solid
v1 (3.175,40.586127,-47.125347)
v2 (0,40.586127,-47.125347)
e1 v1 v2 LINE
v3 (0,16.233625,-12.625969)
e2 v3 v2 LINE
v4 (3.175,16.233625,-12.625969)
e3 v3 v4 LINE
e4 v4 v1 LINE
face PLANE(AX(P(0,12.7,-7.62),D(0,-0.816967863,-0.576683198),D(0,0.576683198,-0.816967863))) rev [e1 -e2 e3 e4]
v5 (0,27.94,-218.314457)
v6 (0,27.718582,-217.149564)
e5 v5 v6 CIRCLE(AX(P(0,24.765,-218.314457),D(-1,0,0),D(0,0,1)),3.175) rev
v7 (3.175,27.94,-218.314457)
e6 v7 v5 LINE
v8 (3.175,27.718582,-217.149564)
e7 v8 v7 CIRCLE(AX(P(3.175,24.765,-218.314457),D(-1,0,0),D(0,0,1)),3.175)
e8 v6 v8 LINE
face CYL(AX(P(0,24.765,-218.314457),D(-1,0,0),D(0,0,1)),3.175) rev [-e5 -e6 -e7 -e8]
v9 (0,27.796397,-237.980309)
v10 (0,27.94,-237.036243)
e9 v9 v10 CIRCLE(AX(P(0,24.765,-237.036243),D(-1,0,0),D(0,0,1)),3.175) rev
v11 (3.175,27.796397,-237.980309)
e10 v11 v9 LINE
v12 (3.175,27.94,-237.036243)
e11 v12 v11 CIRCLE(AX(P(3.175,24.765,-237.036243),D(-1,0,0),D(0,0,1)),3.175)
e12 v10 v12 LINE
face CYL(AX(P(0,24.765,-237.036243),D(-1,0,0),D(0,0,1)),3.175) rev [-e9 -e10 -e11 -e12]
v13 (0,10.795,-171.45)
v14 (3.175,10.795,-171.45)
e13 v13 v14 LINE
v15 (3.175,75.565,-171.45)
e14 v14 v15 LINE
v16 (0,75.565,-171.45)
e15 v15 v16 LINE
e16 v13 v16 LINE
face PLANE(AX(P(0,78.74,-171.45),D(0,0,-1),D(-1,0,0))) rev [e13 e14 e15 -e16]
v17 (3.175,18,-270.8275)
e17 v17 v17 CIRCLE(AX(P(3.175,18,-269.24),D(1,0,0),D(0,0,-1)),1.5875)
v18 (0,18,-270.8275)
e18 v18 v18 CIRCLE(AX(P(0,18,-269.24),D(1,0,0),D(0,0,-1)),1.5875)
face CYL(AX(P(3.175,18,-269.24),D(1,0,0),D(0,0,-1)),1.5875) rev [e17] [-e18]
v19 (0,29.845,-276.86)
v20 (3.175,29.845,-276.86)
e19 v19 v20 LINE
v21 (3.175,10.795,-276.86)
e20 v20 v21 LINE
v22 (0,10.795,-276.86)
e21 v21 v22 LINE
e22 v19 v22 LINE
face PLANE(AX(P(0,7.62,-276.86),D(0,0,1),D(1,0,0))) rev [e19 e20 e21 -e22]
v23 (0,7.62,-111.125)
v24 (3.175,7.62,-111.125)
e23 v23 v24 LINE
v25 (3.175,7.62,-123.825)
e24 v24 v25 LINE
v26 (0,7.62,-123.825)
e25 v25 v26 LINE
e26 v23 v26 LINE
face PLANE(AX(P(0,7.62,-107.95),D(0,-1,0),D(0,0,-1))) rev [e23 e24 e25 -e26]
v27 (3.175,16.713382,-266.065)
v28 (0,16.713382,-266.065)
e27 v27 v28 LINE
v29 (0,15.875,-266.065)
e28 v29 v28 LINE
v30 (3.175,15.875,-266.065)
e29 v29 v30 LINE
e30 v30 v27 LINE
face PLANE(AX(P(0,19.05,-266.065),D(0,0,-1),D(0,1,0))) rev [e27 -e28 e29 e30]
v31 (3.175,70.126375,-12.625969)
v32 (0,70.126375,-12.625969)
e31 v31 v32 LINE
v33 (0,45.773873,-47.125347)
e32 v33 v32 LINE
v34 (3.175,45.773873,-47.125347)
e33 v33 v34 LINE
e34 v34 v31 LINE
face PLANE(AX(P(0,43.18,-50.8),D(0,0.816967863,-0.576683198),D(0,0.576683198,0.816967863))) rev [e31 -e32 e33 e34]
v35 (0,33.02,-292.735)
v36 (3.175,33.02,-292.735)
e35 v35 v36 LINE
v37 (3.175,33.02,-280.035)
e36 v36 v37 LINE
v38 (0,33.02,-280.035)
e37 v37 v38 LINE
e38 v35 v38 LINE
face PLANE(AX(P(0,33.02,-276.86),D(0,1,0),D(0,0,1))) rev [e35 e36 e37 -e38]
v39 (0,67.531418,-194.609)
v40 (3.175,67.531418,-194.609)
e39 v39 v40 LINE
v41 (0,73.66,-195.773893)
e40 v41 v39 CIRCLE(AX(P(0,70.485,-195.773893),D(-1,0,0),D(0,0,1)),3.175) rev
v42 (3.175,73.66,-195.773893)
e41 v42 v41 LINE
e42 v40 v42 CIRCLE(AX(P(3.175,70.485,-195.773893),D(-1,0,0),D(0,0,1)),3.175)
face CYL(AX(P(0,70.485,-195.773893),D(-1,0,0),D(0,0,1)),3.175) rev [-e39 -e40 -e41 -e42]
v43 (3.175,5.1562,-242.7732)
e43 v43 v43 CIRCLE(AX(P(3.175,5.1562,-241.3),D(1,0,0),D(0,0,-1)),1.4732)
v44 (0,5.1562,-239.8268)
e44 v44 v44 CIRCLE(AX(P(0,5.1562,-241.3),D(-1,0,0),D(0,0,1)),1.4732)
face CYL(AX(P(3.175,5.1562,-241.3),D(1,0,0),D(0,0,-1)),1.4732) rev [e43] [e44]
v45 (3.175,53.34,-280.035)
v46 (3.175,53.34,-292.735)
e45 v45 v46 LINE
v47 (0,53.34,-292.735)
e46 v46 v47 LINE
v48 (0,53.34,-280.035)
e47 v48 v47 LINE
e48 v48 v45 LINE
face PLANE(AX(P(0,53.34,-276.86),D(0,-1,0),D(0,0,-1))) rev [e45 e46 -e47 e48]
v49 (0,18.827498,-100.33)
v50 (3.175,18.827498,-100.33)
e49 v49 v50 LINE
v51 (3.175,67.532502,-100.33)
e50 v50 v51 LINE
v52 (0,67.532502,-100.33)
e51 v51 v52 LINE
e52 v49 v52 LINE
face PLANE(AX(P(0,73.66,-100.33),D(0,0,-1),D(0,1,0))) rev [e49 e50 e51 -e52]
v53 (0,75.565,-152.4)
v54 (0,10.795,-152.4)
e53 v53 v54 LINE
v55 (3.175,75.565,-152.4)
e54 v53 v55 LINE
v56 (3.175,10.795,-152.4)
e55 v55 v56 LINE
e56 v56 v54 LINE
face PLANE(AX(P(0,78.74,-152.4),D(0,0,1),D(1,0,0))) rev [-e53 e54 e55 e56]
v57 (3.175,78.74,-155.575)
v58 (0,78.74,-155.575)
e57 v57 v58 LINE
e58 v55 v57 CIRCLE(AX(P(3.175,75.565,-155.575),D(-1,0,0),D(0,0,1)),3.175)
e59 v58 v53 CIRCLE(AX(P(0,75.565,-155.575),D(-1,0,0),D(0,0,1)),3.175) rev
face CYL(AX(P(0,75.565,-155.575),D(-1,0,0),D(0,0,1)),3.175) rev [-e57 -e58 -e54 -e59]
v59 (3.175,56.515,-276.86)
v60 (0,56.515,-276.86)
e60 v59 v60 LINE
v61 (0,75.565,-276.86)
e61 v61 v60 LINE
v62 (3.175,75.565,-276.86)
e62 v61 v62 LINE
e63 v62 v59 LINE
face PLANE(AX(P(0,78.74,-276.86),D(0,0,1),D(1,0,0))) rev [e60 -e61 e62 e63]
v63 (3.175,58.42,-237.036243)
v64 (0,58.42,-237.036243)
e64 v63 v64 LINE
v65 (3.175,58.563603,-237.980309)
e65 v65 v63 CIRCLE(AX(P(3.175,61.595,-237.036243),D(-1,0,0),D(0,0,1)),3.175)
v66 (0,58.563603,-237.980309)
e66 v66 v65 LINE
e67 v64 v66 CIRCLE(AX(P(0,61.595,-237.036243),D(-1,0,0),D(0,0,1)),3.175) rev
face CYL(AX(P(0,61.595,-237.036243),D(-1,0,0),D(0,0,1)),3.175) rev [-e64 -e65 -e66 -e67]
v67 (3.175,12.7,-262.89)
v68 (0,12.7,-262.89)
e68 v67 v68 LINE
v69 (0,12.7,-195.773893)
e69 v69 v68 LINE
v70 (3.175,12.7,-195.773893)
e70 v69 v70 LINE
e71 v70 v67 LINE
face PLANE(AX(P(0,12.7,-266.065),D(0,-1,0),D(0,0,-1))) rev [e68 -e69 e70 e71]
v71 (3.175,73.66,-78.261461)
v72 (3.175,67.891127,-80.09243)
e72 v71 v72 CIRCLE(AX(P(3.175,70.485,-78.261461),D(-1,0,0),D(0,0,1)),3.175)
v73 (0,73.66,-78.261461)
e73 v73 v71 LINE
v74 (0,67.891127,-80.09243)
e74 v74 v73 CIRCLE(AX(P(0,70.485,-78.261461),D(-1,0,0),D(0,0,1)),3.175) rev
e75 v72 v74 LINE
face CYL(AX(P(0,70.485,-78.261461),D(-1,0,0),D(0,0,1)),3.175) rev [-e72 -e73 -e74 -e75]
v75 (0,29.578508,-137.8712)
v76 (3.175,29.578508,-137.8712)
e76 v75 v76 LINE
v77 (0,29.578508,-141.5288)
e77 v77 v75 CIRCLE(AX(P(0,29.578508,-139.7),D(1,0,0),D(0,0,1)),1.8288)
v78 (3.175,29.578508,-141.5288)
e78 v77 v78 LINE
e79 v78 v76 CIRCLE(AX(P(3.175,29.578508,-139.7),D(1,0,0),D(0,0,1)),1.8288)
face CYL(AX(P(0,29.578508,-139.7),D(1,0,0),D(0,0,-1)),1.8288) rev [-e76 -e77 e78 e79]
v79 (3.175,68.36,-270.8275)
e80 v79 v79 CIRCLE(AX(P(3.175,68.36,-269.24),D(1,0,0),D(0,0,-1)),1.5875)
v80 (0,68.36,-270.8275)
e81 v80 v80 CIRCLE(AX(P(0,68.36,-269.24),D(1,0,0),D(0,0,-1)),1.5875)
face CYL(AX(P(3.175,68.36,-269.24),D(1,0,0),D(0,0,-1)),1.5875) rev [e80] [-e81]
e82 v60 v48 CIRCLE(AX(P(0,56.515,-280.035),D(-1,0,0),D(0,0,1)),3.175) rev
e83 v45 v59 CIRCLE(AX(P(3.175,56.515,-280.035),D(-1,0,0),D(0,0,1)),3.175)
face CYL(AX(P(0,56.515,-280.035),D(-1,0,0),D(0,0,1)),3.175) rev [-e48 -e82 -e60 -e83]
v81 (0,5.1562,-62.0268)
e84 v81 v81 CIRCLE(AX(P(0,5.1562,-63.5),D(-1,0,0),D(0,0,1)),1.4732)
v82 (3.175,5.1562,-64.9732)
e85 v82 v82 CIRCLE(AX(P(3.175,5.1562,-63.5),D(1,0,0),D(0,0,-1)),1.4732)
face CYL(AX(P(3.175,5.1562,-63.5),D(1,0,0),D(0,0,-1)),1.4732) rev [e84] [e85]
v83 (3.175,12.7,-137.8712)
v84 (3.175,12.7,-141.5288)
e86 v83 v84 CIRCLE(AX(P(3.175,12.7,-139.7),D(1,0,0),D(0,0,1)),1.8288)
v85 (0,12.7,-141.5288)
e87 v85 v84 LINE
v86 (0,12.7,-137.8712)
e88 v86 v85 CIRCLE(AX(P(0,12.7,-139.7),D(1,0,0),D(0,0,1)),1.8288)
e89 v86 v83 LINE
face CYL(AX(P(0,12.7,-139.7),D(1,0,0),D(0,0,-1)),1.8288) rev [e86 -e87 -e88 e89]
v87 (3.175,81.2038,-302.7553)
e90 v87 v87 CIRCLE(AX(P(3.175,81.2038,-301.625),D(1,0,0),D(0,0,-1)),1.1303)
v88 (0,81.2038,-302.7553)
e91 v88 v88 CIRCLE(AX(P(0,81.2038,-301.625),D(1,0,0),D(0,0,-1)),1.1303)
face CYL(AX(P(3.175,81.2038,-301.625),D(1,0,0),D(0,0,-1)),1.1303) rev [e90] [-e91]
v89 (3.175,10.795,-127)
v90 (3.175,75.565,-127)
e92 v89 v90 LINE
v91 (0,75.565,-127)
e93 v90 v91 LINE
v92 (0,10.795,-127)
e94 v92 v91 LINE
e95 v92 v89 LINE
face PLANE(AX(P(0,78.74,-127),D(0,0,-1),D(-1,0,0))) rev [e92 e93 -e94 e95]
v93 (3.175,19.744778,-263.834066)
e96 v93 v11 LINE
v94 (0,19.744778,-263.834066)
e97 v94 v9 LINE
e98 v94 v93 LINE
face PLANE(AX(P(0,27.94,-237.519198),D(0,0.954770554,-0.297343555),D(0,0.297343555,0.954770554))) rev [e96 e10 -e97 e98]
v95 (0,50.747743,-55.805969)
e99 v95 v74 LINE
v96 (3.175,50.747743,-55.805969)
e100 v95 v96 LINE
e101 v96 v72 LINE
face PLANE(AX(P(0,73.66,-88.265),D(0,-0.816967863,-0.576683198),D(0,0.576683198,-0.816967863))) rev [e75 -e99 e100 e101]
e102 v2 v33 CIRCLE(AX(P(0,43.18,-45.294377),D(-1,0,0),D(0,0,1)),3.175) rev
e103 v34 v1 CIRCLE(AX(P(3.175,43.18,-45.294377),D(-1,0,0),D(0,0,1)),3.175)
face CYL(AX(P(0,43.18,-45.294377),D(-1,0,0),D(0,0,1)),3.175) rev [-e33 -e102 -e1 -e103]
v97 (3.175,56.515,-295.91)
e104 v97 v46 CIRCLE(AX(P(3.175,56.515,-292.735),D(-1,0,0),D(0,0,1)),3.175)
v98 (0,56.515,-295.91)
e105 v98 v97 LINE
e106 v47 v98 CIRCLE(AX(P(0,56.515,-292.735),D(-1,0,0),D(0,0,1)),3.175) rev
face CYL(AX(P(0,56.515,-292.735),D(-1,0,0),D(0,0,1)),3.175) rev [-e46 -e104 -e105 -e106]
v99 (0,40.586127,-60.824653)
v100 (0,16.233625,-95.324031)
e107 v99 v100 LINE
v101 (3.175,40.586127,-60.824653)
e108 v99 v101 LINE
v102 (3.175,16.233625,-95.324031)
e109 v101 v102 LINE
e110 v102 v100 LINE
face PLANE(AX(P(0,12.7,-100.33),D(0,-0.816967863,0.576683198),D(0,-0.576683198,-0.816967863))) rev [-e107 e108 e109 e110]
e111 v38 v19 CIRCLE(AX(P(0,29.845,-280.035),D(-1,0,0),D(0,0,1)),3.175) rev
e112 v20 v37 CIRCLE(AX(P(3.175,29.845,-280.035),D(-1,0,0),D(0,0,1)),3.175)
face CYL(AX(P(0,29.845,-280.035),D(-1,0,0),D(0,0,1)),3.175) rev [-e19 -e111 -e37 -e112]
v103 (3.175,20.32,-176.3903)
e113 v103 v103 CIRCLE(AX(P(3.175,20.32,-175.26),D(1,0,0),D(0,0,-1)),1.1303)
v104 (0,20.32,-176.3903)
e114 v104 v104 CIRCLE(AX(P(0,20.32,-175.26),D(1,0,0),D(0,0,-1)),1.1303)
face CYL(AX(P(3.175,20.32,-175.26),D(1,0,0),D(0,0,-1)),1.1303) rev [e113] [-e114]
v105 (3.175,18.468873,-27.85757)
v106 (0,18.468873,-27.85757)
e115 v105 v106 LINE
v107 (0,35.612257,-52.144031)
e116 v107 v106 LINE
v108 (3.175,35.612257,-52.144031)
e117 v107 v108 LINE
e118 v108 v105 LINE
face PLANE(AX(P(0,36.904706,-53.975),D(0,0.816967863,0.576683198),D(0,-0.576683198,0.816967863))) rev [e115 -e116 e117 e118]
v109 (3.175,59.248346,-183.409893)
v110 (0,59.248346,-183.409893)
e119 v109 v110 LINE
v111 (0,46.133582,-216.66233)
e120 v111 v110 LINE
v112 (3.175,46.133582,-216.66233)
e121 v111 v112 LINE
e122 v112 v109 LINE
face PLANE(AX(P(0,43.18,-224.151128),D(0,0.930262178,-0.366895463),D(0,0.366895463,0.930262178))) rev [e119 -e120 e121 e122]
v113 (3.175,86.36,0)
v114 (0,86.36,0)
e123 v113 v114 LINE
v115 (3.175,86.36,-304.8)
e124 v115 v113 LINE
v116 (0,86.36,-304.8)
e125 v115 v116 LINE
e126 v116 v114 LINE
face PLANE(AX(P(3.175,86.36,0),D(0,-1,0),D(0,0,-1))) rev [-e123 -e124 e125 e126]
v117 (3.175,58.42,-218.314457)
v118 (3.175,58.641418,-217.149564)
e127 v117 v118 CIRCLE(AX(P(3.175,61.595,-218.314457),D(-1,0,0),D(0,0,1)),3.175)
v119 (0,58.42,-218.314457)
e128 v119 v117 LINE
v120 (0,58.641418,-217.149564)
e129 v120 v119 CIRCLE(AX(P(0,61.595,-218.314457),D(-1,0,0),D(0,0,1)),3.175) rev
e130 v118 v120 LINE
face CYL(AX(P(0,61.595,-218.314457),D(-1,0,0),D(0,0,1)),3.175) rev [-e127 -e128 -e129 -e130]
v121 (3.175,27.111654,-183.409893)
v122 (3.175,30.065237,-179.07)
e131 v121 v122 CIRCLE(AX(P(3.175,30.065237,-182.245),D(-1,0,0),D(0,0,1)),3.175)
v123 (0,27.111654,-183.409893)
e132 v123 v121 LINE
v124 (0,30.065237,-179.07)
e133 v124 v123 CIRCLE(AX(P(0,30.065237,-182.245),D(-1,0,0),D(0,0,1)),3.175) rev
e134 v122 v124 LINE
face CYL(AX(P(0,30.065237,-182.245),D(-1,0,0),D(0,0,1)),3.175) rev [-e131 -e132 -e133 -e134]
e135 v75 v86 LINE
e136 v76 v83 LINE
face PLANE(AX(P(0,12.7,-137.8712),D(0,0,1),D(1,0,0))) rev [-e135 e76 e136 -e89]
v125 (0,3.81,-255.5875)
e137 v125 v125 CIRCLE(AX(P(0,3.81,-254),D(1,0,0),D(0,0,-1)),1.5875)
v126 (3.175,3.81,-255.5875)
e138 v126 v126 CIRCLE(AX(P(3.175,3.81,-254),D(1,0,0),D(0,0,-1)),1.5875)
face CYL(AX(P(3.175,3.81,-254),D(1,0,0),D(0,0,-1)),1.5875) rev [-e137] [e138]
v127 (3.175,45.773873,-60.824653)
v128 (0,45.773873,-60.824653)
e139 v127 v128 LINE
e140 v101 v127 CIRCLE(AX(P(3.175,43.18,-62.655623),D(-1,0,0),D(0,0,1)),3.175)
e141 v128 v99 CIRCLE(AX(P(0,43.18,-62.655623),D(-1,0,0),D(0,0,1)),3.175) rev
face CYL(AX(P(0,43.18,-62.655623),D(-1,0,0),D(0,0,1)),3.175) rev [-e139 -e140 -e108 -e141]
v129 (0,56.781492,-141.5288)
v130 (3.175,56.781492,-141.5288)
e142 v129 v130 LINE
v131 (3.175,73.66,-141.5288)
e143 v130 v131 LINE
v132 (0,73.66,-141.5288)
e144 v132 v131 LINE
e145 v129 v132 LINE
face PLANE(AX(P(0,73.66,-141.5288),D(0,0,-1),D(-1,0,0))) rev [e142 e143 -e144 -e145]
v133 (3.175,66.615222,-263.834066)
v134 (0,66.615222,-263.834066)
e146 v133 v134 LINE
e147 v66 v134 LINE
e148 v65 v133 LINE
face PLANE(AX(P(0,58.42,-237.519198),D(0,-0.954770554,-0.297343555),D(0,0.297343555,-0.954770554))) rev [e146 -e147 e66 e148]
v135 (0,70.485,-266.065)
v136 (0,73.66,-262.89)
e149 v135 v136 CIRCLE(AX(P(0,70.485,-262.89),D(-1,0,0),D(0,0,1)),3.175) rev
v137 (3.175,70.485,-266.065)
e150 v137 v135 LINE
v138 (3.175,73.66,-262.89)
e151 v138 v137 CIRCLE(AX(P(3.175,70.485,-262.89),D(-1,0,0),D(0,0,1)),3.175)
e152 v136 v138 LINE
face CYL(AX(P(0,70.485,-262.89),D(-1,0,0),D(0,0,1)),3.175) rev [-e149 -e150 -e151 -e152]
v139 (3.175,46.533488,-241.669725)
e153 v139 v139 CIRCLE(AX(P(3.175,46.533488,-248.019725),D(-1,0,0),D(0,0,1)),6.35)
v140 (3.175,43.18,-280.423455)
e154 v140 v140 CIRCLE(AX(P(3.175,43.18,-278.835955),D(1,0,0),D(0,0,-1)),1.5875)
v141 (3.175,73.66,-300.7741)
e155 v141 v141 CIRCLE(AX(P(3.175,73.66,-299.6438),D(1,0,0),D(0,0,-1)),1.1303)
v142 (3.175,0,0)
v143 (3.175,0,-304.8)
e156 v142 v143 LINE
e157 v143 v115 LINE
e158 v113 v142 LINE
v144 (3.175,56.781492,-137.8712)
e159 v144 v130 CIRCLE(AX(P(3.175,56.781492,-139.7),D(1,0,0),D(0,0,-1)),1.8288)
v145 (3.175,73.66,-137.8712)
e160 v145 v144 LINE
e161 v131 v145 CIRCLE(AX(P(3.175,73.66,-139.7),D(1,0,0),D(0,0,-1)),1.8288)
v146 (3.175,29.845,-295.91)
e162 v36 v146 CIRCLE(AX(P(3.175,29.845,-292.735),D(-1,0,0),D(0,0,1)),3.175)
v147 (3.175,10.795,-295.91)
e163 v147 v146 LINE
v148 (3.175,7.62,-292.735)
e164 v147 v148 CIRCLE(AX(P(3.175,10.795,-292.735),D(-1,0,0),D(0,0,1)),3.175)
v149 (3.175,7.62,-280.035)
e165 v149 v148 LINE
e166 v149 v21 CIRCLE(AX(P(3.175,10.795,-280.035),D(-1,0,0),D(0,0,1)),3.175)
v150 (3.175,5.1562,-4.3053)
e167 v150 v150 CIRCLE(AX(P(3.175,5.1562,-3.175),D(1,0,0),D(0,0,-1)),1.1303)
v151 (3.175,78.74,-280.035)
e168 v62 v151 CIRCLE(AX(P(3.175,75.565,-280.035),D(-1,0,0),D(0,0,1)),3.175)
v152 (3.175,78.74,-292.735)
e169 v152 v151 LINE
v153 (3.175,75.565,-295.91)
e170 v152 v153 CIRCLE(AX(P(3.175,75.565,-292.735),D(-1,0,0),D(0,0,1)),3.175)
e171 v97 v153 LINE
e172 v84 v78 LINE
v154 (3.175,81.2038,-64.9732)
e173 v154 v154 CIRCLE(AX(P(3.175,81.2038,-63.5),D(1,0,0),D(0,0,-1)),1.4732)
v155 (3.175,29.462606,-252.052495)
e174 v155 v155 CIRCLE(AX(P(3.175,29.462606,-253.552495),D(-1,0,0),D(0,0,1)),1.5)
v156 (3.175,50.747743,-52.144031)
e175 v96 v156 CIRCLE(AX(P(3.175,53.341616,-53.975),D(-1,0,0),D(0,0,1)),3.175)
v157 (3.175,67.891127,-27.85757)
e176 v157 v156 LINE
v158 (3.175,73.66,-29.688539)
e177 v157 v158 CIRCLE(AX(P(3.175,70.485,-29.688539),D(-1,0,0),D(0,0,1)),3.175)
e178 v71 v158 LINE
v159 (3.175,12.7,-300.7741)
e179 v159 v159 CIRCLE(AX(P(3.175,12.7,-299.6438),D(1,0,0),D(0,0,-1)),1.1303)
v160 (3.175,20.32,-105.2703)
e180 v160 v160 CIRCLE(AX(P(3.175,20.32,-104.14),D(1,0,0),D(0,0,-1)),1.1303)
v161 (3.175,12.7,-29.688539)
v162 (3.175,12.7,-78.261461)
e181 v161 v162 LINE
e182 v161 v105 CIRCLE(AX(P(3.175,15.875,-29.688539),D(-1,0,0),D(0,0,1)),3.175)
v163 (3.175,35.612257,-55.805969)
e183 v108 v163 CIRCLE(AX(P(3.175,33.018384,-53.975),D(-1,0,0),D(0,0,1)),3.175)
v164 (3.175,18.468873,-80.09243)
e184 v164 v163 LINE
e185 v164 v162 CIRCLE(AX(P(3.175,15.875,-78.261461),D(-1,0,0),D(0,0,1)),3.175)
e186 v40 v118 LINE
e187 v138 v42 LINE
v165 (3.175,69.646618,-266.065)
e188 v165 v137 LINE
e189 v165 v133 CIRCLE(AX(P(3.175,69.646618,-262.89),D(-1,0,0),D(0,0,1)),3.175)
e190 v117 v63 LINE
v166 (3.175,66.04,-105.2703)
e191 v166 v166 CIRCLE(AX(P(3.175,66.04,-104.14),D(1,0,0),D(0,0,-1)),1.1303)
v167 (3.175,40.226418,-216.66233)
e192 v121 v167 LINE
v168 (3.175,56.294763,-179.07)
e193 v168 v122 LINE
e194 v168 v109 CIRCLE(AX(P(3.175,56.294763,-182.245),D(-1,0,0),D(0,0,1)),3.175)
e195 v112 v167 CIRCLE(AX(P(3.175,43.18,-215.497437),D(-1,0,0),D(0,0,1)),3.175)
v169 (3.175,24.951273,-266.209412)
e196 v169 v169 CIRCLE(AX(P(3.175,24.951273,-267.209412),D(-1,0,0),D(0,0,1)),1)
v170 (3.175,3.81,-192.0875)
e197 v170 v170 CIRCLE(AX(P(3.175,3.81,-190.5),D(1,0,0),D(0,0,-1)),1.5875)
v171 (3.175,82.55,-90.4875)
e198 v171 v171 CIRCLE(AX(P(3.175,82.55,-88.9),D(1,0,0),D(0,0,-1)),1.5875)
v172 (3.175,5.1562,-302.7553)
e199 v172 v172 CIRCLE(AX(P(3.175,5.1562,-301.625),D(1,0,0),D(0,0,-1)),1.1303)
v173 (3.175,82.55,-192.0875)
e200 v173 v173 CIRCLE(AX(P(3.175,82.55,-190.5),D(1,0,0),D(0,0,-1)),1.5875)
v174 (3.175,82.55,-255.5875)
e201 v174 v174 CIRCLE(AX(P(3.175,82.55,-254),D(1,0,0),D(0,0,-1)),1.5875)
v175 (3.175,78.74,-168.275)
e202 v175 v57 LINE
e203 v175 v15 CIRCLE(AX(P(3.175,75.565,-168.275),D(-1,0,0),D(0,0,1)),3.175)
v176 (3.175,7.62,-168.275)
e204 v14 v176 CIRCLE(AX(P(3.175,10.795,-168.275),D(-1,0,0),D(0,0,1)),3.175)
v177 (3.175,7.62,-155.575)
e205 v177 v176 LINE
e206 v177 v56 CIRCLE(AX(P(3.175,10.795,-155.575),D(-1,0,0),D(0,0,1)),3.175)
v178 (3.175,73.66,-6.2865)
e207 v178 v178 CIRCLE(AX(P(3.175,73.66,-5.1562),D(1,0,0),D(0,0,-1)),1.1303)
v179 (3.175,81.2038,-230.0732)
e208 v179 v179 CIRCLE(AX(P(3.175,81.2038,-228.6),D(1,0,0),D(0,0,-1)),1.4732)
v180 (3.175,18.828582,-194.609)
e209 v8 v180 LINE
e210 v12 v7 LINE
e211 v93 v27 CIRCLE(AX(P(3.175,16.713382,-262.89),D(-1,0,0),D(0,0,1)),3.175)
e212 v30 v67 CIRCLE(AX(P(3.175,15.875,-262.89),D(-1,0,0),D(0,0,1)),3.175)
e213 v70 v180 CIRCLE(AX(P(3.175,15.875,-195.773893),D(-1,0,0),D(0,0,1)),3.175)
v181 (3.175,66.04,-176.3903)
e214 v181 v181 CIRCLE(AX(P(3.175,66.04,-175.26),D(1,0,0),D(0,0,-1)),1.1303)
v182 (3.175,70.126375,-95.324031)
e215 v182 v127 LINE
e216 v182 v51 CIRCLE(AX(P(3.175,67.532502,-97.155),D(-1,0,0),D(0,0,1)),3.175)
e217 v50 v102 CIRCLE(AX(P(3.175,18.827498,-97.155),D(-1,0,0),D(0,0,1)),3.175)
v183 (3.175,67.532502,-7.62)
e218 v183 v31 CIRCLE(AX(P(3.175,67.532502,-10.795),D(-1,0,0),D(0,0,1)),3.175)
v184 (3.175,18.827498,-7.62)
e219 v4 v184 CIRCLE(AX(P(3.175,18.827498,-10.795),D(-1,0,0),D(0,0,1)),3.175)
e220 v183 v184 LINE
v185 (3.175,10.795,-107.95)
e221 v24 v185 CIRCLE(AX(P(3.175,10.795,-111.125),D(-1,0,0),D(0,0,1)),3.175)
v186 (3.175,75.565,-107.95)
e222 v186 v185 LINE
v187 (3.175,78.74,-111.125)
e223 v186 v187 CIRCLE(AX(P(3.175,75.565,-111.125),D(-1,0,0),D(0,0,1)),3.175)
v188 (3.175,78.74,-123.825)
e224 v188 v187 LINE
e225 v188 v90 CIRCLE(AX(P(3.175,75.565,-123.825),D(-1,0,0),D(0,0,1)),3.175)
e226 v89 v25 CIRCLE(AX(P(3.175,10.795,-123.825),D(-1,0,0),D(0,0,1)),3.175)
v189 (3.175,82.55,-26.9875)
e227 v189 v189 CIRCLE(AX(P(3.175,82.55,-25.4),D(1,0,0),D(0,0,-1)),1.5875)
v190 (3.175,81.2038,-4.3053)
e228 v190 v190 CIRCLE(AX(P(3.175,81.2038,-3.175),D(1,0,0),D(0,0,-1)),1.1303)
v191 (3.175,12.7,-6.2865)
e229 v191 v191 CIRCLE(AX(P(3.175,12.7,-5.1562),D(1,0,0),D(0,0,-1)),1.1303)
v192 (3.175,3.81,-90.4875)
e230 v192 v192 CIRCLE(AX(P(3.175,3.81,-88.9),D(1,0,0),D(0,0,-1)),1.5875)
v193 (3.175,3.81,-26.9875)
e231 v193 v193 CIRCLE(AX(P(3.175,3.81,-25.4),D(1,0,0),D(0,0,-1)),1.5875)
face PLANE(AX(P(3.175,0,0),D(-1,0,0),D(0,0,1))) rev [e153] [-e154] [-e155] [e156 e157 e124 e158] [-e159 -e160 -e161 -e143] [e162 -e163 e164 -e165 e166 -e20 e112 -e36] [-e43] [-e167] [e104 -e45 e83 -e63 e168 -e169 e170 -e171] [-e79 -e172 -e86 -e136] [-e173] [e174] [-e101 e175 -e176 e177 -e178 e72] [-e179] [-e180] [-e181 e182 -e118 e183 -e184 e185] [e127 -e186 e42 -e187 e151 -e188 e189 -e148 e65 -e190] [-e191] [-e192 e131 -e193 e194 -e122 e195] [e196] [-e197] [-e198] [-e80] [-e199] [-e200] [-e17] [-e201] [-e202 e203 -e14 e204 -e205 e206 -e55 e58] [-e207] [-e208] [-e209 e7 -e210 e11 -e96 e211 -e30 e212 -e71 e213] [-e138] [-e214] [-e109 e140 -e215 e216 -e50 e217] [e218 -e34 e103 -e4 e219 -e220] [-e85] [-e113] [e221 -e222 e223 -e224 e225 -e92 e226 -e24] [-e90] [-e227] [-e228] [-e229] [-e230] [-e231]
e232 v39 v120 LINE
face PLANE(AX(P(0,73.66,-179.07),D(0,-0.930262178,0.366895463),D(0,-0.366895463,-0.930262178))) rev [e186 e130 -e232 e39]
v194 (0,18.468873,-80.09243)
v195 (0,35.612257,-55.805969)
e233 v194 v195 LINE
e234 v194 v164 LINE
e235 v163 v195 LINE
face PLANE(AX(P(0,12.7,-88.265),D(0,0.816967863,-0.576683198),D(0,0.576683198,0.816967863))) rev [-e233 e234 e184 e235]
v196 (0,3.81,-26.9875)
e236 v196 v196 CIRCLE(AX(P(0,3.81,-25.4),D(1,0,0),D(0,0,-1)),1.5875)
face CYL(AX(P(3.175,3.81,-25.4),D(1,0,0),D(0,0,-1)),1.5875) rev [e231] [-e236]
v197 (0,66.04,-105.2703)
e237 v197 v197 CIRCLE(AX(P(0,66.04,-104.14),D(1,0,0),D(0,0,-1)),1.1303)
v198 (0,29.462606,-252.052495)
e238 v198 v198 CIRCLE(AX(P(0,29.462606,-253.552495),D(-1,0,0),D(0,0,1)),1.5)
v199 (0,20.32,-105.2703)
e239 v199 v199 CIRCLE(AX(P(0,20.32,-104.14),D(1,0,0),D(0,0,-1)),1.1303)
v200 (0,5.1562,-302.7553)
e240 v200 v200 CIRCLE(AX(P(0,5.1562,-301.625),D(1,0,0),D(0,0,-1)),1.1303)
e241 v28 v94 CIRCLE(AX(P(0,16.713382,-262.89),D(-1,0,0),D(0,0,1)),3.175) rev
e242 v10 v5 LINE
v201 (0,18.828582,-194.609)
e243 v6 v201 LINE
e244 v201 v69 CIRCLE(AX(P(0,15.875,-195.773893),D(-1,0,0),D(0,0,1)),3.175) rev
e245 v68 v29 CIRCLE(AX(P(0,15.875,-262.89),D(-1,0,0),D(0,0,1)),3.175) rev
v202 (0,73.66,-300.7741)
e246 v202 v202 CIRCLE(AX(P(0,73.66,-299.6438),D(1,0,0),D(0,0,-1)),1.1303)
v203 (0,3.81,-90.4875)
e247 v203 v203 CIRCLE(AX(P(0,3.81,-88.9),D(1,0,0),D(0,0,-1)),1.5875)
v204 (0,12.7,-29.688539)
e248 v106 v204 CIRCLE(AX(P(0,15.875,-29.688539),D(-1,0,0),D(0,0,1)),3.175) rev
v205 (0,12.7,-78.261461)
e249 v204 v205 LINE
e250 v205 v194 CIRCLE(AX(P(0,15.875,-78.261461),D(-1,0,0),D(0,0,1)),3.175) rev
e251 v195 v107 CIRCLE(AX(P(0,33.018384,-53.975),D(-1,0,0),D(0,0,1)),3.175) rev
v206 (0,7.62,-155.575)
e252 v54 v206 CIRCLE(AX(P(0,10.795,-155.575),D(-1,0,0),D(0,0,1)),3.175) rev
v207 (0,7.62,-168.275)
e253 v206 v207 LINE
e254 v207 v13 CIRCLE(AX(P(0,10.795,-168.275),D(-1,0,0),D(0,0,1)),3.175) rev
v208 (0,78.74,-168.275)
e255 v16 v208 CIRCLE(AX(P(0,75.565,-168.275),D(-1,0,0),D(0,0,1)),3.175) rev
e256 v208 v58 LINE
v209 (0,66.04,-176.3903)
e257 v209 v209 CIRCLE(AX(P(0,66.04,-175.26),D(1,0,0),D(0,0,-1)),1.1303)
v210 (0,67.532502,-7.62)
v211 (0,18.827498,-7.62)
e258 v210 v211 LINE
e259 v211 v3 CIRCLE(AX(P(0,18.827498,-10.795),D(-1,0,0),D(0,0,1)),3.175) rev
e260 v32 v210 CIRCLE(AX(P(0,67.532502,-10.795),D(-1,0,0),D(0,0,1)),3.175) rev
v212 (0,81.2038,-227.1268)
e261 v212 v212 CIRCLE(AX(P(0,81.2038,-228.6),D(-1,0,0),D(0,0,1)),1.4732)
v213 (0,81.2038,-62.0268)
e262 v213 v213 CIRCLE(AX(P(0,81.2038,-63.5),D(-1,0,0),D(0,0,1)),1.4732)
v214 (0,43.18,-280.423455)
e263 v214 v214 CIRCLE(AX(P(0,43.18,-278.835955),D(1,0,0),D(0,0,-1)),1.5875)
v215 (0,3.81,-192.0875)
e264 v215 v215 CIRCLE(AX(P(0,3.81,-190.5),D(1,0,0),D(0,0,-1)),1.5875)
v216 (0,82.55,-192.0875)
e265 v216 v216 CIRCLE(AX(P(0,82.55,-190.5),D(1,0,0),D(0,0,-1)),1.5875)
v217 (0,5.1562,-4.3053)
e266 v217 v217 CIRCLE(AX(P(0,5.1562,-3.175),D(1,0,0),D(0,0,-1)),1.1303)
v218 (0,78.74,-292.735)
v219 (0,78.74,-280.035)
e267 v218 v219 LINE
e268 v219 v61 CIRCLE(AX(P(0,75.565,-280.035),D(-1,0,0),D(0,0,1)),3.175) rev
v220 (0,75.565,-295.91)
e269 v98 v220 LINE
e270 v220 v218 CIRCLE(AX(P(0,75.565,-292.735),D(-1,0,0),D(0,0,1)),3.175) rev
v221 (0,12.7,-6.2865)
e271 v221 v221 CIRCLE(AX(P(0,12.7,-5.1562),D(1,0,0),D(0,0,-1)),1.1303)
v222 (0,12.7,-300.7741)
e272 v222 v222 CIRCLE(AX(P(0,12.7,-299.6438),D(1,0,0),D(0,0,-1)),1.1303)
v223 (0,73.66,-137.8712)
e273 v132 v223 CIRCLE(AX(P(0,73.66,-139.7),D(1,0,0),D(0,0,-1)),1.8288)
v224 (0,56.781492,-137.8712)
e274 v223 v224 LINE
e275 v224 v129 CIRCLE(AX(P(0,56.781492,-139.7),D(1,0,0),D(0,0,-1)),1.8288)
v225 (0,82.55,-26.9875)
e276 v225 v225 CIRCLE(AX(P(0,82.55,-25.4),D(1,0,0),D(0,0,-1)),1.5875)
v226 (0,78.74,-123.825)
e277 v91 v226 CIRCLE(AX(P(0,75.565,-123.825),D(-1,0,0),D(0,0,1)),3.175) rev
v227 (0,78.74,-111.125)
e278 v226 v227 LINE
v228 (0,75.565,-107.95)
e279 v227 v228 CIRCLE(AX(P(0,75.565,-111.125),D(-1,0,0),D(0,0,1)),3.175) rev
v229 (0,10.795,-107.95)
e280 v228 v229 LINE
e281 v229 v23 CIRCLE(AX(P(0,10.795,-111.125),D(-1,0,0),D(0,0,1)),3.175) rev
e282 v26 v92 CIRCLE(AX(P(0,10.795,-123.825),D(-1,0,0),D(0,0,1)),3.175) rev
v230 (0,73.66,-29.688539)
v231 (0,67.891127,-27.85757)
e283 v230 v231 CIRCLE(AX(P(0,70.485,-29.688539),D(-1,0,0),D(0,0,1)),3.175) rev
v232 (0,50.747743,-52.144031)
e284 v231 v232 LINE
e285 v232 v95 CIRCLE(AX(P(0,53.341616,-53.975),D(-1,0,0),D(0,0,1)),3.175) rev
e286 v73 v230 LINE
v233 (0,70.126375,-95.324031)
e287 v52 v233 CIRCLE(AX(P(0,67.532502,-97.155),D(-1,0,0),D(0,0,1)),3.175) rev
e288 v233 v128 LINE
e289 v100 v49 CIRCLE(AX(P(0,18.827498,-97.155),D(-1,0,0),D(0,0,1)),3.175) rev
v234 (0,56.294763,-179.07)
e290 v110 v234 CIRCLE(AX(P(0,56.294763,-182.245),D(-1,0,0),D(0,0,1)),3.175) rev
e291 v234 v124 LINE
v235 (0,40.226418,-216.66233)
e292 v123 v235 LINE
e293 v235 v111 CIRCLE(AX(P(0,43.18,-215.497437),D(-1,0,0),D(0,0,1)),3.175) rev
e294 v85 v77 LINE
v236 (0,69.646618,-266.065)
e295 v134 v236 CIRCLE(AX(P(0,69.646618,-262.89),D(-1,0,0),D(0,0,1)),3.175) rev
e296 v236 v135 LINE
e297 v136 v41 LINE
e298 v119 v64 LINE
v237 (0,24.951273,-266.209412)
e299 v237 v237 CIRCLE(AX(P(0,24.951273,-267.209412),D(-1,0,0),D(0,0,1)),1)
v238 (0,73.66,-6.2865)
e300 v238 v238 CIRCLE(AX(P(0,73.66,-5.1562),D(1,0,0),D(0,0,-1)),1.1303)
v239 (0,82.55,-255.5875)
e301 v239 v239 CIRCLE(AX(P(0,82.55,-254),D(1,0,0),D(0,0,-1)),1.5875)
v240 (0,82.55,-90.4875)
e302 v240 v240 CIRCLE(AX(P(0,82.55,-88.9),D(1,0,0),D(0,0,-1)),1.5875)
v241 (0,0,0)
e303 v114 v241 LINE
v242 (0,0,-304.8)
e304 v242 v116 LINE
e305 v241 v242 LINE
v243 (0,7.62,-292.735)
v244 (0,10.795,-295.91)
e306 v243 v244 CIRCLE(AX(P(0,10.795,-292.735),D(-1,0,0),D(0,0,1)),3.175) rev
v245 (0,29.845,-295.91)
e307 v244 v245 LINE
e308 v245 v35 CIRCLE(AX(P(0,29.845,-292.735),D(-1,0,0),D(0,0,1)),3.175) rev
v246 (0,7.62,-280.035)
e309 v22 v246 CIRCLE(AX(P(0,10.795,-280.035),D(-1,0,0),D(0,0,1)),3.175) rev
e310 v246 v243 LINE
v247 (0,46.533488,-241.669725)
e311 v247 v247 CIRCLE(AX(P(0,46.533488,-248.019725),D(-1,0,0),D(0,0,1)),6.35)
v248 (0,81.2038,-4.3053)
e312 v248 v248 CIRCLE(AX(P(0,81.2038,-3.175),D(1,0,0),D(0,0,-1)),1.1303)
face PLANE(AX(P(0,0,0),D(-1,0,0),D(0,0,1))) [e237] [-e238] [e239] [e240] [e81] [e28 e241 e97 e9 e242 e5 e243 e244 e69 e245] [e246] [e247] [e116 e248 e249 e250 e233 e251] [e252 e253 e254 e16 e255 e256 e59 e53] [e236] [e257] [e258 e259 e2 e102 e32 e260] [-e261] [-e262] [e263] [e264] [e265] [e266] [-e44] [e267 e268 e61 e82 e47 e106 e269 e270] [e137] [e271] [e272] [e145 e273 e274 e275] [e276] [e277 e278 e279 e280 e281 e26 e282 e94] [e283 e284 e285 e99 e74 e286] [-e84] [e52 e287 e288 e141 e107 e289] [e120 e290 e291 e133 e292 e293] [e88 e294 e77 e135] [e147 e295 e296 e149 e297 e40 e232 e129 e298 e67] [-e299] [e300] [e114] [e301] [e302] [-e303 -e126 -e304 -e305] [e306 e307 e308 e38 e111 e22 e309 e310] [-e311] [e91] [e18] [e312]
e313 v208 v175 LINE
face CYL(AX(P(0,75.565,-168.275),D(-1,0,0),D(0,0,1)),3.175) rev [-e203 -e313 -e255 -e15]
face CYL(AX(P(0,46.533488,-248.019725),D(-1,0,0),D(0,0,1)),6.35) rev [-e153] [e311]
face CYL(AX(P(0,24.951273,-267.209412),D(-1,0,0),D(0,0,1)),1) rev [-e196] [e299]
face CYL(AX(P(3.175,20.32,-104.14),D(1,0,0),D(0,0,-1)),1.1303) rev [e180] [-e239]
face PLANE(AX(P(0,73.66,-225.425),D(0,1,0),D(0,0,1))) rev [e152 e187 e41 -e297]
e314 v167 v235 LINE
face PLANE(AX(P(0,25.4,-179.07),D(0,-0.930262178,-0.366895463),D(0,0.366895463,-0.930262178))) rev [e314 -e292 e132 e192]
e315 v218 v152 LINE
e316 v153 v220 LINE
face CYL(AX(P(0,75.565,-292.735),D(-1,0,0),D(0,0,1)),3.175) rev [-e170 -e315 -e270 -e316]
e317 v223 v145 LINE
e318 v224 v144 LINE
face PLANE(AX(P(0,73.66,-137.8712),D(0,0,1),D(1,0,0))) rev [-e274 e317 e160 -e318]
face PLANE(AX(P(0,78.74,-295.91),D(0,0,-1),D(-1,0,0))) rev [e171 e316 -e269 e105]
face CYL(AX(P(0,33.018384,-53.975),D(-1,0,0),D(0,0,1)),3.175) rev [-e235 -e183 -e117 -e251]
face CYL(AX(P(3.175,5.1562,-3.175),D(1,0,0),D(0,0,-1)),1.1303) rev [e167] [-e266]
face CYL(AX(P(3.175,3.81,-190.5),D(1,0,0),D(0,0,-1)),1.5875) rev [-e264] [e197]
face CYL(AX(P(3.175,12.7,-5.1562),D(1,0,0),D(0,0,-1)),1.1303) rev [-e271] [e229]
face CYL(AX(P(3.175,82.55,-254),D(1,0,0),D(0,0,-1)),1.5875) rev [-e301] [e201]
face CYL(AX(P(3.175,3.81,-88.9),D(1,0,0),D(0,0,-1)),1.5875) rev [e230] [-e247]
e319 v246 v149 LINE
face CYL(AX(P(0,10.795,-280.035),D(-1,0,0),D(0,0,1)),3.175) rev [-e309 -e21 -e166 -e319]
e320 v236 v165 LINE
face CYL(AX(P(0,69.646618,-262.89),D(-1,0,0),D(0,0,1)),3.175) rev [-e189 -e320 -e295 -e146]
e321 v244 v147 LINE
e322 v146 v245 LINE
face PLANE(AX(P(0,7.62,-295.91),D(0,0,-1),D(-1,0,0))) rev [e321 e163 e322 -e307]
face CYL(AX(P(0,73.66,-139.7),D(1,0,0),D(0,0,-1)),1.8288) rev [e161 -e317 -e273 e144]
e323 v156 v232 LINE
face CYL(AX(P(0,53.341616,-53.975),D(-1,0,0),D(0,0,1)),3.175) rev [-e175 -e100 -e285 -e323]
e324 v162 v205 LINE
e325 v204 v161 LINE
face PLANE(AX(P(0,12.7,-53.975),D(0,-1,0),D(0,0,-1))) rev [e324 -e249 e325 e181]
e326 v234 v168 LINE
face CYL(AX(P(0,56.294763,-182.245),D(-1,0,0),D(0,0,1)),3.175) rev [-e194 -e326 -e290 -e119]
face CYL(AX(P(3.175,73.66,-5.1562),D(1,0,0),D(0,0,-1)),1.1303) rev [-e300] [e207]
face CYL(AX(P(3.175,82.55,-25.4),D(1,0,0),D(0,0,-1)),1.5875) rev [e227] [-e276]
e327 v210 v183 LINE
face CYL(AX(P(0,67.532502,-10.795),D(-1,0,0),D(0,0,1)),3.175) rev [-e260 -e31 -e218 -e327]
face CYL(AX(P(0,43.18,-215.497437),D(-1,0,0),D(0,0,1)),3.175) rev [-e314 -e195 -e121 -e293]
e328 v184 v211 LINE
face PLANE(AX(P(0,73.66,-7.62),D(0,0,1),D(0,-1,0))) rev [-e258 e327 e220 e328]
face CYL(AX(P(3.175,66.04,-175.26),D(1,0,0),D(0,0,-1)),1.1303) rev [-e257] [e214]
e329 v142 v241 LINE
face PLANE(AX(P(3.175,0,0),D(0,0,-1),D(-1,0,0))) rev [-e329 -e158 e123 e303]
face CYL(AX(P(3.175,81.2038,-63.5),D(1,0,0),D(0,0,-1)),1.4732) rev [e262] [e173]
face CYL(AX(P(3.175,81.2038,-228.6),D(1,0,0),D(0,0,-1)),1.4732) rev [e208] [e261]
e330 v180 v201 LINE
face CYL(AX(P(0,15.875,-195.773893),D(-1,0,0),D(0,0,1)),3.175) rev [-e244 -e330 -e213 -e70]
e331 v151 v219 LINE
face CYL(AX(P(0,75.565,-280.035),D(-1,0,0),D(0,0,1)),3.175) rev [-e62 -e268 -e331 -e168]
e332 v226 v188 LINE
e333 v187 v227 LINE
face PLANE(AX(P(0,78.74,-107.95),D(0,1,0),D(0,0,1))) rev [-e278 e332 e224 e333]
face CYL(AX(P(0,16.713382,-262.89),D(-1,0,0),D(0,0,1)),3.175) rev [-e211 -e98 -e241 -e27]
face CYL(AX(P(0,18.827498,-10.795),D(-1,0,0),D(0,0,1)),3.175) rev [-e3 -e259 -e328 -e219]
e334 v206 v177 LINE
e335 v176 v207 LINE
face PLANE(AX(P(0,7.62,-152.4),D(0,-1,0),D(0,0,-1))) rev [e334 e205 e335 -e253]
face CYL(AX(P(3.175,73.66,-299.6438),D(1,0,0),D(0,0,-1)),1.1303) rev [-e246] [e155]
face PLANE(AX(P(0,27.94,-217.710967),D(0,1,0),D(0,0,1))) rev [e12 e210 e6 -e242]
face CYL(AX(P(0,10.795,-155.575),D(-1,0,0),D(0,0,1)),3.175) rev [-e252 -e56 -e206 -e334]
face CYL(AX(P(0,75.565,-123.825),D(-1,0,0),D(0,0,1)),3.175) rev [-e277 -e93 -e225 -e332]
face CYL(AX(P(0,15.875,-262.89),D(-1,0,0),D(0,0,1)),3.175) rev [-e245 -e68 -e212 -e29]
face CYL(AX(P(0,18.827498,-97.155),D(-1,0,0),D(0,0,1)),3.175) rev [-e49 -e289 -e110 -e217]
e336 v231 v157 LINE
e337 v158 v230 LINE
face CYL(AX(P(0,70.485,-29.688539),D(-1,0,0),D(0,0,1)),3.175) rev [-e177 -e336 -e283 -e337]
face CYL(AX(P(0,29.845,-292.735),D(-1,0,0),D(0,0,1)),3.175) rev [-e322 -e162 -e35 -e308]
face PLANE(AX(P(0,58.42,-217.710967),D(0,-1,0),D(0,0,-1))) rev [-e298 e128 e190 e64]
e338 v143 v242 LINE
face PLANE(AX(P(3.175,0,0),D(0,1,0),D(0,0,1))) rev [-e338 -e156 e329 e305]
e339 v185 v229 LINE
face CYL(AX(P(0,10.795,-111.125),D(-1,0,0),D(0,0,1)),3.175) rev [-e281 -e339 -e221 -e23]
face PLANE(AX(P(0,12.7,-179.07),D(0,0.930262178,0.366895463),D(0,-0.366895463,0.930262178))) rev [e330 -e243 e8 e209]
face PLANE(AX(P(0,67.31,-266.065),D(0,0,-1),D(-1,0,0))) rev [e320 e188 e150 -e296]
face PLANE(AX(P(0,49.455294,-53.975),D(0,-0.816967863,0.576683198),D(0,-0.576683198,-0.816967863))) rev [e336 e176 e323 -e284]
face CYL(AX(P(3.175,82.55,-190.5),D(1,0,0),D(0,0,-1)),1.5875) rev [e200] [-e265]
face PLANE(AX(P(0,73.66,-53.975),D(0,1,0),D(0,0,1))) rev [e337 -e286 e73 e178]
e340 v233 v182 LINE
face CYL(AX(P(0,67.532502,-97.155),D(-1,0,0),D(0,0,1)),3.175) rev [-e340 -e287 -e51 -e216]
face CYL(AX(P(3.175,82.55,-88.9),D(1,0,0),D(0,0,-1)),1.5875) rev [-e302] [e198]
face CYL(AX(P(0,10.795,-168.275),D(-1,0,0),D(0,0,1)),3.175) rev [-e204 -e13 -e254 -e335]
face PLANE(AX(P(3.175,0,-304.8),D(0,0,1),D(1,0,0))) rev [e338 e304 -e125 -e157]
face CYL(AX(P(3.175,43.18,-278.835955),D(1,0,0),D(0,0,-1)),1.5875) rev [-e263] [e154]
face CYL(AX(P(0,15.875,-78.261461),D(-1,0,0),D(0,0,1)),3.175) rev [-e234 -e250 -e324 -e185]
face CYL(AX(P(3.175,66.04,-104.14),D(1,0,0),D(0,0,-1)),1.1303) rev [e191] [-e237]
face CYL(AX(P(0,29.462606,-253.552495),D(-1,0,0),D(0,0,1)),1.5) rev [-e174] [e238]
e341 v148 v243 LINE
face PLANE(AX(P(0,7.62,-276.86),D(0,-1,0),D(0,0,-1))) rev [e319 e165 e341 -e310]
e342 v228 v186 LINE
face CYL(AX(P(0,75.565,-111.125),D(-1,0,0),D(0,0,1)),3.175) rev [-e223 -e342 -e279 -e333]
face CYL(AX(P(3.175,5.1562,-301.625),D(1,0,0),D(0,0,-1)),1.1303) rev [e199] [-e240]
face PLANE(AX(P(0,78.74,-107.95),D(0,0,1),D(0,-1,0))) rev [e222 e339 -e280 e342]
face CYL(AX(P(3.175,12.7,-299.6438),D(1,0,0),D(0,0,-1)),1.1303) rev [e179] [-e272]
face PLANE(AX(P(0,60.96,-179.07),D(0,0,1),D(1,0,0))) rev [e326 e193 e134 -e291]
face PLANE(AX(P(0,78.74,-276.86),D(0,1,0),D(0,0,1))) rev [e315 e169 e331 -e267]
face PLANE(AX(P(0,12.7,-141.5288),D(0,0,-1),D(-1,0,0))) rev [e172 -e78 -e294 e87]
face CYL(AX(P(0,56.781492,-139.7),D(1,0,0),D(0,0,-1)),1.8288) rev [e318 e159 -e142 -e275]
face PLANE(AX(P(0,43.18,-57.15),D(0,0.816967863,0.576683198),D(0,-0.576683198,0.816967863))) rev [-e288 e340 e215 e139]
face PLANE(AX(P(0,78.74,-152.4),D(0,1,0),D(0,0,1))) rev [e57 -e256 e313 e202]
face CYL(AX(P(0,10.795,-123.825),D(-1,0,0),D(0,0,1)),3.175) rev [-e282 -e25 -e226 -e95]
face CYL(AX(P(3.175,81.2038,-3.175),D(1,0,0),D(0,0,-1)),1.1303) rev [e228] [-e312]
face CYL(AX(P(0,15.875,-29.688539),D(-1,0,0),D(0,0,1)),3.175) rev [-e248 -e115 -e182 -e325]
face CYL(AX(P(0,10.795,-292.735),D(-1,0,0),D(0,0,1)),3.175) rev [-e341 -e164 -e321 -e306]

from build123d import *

# Parameters (mm, degrees)
SKETCH1_W                               = 304.8
SKETCH1_H                               = 86.36
BOSS_EXTRUDE1_DEPTH                     = 3.175
F_1_8_0_125_PRESS_DOWEL_HOLE1_OUTLINE_R = 1.5875
F_1_8_0_125_PRESS_DOWEL_HOLE1_DEPTH     = 3.175
CUT_EXTRUDE1_DEPTH                      = 317.814094107
SKETCH7_W                               = 19.05
SKETCH7_H                               = 25.4
SKETCH7_H_2                             = 71.12
CUT_EXTRUDE2_DEPTH                      = 317.814094107
FILLET1_R                               = 3.175
F_1_2_0_5_PRESS_DOWEL_HOLE1_D           = 12.7
F_3_0MM_PRESS_DOWEL_HOLE1_D             = 3
F_3_0MM_PRESS_DOWEL_HOLE1_DEPTH         = 3.175
F_3_0MM_PRESS_DOWEL_HOLE1_TIP           = 0.901290929
F_2_0MM_PRESS_DOWEL_HOLE1_D             = 2
F_2_0MM_PRESS_DOWEL_HOLE1_DEPTH         = 3.175
F_2_0MM_PRESS_DOWEL_HOLE1_TIP           = 0.600860619
F_4_40_TAPPED_HOLE2_D                   = 2.2606
F_1_8_0_125_DIAMETER_HOLE1_D            = 3.175
F_4_CLEARANCE_HOLE1_D                   = 2.9464
F_4_CLEARANCE_HOLE1_DEPTH               = 9.1694
F_4_CLEARANCE_HOLE1_TIP                 = 0.885187864


# Read off the part's stored shape, not the designer's step: 1/8 (0.125) Press Dowel Hole1
with BuildPart() as part:
    # Sketch1 → Boss-Extrude1 (new body)
    with BuildSketch(Plane(origin=(0, 0, 0), x_dir=(0, 0, -1), z_dir=(1, 0, 0))):
        with Locations((152.4, 43.18)):
            Rectangle(SKETCH1_W, SKETCH1_H)
    extrude(amount=BOSS_EXTRUDE1_DEPTH)

    # 1/8 (0.125) Press Dowel Hole1 outline → 1/8 (0.125) Press Dowel Hole1 (cut)
    with BuildSketch(Plane.YZ):
        with Locations((68.36, -269.24)):
            Circle(F_1_8_0_125_PRESS_DOWEL_HOLE1_OUTLINE_R)
        with Locations((18, -269.24)):
            Circle(F_1_8_0_125_PRESS_DOWEL_HOLE1_OUTLINE_R)
        with Locations((82.55, -25.4)):
            Circle(F_1_8_0_125_PRESS_DOWEL_HOLE1_OUTLINE_R)
        with Locations((82.55, -88.9)):
            Circle(F_1_8_0_125_PRESS_DOWEL_HOLE1_OUTLINE_R)
        with Locations((82.55, -190.5)):
            Circle(F_1_8_0_125_PRESS_DOWEL_HOLE1_OUTLINE_R)
        with Locations((82.55, -254)):
            Circle(F_1_8_0_125_PRESS_DOWEL_HOLE1_OUTLINE_R)
        with Locations((3.81, -254)):
            Circle(F_1_8_0_125_PRESS_DOWEL_HOLE1_OUTLINE_R)
        with Locations((3.81, -190.5)):
            Circle(F_1_8_0_125_PRESS_DOWEL_HOLE1_OUTLINE_R)
        with Locations((3.81, -88.9)):
            Circle(F_1_8_0_125_PRESS_DOWEL_HOLE1_OUTLINE_R)
        with Locations((3.81, -25.4)):
            Circle(F_1_8_0_125_PRESS_DOWEL_HOLE1_OUTLINE_R)
    extrude(amount=F_1_8_0_125_PRESS_DOWEL_HOLE1_DEPTH, mode=Mode.SUBTRACT)

    # Sketch6 → Cut-Extrude1 (cut, through all)
    with BuildSketch(Plane(origin=(3.175, 0, 0), x_dir=(0, 0, -1), z_dir=(1, 0, 0))):
        with BuildLine():
            Line((141.5288, 73.66), (141.5288, 56.781492032))
            ThreePointArc((141.5288, 56.781492032), (139.7, 54.952692032), (137.8712, 56.781492032))
            Line((137.8712, 56.781492032), (137.8712, 73.66))
            ThreePointArc((137.8712, 73.66), (139.7, 75.4888), (141.5288, 73.66))
        make_face()
        with BuildLine():
            Line((141.5288, 12.7), (141.5288, 29.578507968))
            ThreePointArc((141.5288, 29.578507968), (139.7, 31.407307968), (137.8712, 29.578507968))
            Line((137.8712, 29.578507968), (137.8712, 12.7))
            ThreePointArc((137.8712, 12.7), (139.7, 10.8712), (141.5288, 12.7))
        make_face()
    extrude(amount=-CUT_EXTRUDE1_DEPTH, mode=Mode.SUBTRACT)

    # Sketch7 → Cut-Extrude2 (cut, through all)
    with BuildSketch(Plane(origin=(3.175, 0, 0), x_dir=(0, 0, -1), z_dir=(1, 0, 0))):
        Polygon((7.62, 73.66), (7.62, 12.7), (50.8, 43.18), align=None)
        with Locations((286.385, 66.04)):
            Rectangle(SKETCH7_W, SKETCH7_H)
        Polygon((100.33, 12.7), (57.15, 43.18), (100.33, 73.66), align=None)
        with Locations((161.925, 43.18)):
            Rectangle(SKETCH7_W, SKETCH7_H_2)
        Polygon((179.07, 25.4), (224.15112849, 43.18), (179.07, 60.96), align=None)
        Polygon((53.975, 73.66), (88.265, 73.66), (53.975, 49.455294118), (19.685, 73.66), align=None)
        Polygon((53.975, 36.904705882), (19.685, 12.7), (53.975, 12.7), (88.265, 12.7), align=None)
        Polygon((179.07, 12.7), (217.710967277, 27.94), (237.51919806, 27.94), (266.065, 19.05), (266.065, 12.7), (225.425, 12.7), align=None)
        Polygon((217.710967277, 58.42), (237.51919806, 58.42), (266.065, 67.31), (266.065, 73.66), (225.425, 73.66), (179.07, 73.66), align=None)
        with Locations((286.385, 20.32)):
            Rectangle(SKETCH7_W, SKETCH7_H)
        with Locations((117.475, 43.18)):
            Rectangle(SKETCH7_W, SKETCH7_H_2)
    extrude(amount=-CUT_EXTRUDE2_DEPTH, mode=Mode.SUBTRACT)

    # Fillet1
    fillet1_edges = [part.edges().sort_by_distance(p)[0] for p in [
        (1.5875, 73.66, -7.62),
        (1.5875, 43.18, -50.8),
        (1.5875, 12.7, -7.62),
        (1.5875, 53.34, -276.86),
        (1.5875, 78.74, -276.86),
        (1.5875, 78.74, -295.91),
        (1.5875, 53.34, -295.91),
        (1.5875, 73.66, -100.33),
        (1.5875, 12.7, -100.33),
        (1.5875, 43.18, -57.15),
        (1.5875, 12.7, -179.07),
        (1.5875, 27.94, -217.710967277),
        (1.5875, 27.94, -237.51919806),
        (1.5875, 19.05, -266.065),
        (1.5875, 12.7, -266.065),
        (1.5875, 25.4, -179.07),
        (1.5875, 60.96, -179.07),
        (1.5875, 43.18, -224.15112849),
        (1.5875, 73.66, -19.685),
        (1.5875, 73.66, -88.265),
        (1.5875, 49.455294118, -53.975),
        (1.5875, 36.904705882, -53.975),
        (1.5875, 12.7, -88.265),
        (1.5875, 12.7, -19.685),
        (1.5875, 73.66, -266.065),
        (1.5875, 67.31, -266.065),
        (1.5875, 58.42, -237.51919806),
        (1.5875, 58.42, -217.710967277),
        (1.5875, 73.66, -179.07),
        (1.5875, 7.62, -152.4),
        (1.5875, 78.74, -152.4),
        (1.5875, 78.74, -171.45),
        (1.5875, 7.62, -171.45),
        (1.5875, 7.62, -276.86),
        (1.5875, 33.02, -276.86),
        (1.5875, 33.02, -295.91),
        (1.5875, 7.62, -295.91),
        (1.5875, 7.62, -107.95),
        (1.5875, 78.74, -107.95),
        (1.5875, 78.74, -127),
        (1.5875, 7.62, -127),
    ]]
    fillet(fillet1_edges, radius=FILLET1_R)

    # 1/2 (0.5) Press Dowel Hole1 (through all)
    with Locations(Plane.ZY):
        with Locations((-248.01972494, 46.53348834)):
            Hole(F_1_2_0_5_PRESS_DOWEL_HOLE1_D / 2)

    # Ø3.0mm Press Dowel Hole1
    with Locations(Plane.ZY):
        with Locations((-253.55249518, 29.46260554)):
            Hole(F_3_0MM_PRESS_DOWEL_HOLE1_D / 2, depth=F_3_0MM_PRESS_DOWEL_HOLE1_DEPTH)
            with Locations((0, 0, -(F_3_0MM_PRESS_DOWEL_HOLE1_DEPTH + F_3_0MM_PRESS_DOWEL_HOLE1_TIP / 2))):  # 118° drill point
                Cone(0, F_3_0MM_PRESS_DOWEL_HOLE1_D / 2, F_3_0MM_PRESS_DOWEL_HOLE1_TIP, mode=Mode.SUBTRACT)

    # Ø2.0mm Press Dowel Hole1
    with Locations(Plane.ZY):
        with Locations((-267.20941224, 24.95127344)):
            Hole(F_2_0MM_PRESS_DOWEL_HOLE1_D / 2, depth=F_2_0MM_PRESS_DOWEL_HOLE1_DEPTH)
            with Locations((0, 0, -(F_2_0MM_PRESS_DOWEL_HOLE1_DEPTH + F_2_0MM_PRESS_DOWEL_HOLE1_TIP / 2))):  # 118° drill point
                Cone(0, F_2_0MM_PRESS_DOWEL_HOLE1_D / 2, F_2_0MM_PRESS_DOWEL_HOLE1_TIP, mode=Mode.SUBTRACT)

    # #4-40 Tapped Hole2 (through all)
    with Locations(Plane(origin=(3.175, 0, 0), x_dir=(0, 0, -1), z_dir=(1, 0, 0))):
        with Locations((301.625, 81.2038), (301.625, 5.1562), (3.175, 81.2038), (3.175, 5.1562), (175.26, 66.04), (175.26, 20.32), (104.14, 66.04), (104.14, 20.32), (5.1562, 12.7), (5.1562, 73.66), (299.6438, 73.66), (299.6438, 12.7)):
            Hole(F_4_40_TAPPED_HOLE2_D / 2)

    # 1/8 (0.125) Diameter Hole1 (through all)
    with Locations(Plane(origin=(3.175, 0, 0), x_dir=(0, 0, -1), z_dir=(1, 0, 0))):
        with Locations((278.835955069, 43.18)):
            Hole(F_1_8_0_125_DIAMETER_HOLE1_D / 2)

    # #4 Clearance Hole1
    with Locations(Plane(origin=(3.175, 0, 0), x_dir=(0, 0, -1), z_dir=(1, 0, 0))):
        with Locations((228.6, 81.2038), (63.5, 81.2038), (63.5, 5.1562), (241.3, 5.1562)):
            Hole(F_4_CLEARANCE_HOLE1_D / 2, depth=F_4_CLEARANCE_HOLE1_DEPTH)
            with Locations((0, 0, -(F_4_CLEARANCE_HOLE1_DEPTH + F_4_CLEARANCE_HOLE1_TIP / 2))):  # 118° drill point
                Cone(0, F_4_CLEARANCE_HOLE1_D / 2, F_4_CLEARANCE_HOLE1_TIP, mode=Mode.SUBTRACT)


solid = part.part
